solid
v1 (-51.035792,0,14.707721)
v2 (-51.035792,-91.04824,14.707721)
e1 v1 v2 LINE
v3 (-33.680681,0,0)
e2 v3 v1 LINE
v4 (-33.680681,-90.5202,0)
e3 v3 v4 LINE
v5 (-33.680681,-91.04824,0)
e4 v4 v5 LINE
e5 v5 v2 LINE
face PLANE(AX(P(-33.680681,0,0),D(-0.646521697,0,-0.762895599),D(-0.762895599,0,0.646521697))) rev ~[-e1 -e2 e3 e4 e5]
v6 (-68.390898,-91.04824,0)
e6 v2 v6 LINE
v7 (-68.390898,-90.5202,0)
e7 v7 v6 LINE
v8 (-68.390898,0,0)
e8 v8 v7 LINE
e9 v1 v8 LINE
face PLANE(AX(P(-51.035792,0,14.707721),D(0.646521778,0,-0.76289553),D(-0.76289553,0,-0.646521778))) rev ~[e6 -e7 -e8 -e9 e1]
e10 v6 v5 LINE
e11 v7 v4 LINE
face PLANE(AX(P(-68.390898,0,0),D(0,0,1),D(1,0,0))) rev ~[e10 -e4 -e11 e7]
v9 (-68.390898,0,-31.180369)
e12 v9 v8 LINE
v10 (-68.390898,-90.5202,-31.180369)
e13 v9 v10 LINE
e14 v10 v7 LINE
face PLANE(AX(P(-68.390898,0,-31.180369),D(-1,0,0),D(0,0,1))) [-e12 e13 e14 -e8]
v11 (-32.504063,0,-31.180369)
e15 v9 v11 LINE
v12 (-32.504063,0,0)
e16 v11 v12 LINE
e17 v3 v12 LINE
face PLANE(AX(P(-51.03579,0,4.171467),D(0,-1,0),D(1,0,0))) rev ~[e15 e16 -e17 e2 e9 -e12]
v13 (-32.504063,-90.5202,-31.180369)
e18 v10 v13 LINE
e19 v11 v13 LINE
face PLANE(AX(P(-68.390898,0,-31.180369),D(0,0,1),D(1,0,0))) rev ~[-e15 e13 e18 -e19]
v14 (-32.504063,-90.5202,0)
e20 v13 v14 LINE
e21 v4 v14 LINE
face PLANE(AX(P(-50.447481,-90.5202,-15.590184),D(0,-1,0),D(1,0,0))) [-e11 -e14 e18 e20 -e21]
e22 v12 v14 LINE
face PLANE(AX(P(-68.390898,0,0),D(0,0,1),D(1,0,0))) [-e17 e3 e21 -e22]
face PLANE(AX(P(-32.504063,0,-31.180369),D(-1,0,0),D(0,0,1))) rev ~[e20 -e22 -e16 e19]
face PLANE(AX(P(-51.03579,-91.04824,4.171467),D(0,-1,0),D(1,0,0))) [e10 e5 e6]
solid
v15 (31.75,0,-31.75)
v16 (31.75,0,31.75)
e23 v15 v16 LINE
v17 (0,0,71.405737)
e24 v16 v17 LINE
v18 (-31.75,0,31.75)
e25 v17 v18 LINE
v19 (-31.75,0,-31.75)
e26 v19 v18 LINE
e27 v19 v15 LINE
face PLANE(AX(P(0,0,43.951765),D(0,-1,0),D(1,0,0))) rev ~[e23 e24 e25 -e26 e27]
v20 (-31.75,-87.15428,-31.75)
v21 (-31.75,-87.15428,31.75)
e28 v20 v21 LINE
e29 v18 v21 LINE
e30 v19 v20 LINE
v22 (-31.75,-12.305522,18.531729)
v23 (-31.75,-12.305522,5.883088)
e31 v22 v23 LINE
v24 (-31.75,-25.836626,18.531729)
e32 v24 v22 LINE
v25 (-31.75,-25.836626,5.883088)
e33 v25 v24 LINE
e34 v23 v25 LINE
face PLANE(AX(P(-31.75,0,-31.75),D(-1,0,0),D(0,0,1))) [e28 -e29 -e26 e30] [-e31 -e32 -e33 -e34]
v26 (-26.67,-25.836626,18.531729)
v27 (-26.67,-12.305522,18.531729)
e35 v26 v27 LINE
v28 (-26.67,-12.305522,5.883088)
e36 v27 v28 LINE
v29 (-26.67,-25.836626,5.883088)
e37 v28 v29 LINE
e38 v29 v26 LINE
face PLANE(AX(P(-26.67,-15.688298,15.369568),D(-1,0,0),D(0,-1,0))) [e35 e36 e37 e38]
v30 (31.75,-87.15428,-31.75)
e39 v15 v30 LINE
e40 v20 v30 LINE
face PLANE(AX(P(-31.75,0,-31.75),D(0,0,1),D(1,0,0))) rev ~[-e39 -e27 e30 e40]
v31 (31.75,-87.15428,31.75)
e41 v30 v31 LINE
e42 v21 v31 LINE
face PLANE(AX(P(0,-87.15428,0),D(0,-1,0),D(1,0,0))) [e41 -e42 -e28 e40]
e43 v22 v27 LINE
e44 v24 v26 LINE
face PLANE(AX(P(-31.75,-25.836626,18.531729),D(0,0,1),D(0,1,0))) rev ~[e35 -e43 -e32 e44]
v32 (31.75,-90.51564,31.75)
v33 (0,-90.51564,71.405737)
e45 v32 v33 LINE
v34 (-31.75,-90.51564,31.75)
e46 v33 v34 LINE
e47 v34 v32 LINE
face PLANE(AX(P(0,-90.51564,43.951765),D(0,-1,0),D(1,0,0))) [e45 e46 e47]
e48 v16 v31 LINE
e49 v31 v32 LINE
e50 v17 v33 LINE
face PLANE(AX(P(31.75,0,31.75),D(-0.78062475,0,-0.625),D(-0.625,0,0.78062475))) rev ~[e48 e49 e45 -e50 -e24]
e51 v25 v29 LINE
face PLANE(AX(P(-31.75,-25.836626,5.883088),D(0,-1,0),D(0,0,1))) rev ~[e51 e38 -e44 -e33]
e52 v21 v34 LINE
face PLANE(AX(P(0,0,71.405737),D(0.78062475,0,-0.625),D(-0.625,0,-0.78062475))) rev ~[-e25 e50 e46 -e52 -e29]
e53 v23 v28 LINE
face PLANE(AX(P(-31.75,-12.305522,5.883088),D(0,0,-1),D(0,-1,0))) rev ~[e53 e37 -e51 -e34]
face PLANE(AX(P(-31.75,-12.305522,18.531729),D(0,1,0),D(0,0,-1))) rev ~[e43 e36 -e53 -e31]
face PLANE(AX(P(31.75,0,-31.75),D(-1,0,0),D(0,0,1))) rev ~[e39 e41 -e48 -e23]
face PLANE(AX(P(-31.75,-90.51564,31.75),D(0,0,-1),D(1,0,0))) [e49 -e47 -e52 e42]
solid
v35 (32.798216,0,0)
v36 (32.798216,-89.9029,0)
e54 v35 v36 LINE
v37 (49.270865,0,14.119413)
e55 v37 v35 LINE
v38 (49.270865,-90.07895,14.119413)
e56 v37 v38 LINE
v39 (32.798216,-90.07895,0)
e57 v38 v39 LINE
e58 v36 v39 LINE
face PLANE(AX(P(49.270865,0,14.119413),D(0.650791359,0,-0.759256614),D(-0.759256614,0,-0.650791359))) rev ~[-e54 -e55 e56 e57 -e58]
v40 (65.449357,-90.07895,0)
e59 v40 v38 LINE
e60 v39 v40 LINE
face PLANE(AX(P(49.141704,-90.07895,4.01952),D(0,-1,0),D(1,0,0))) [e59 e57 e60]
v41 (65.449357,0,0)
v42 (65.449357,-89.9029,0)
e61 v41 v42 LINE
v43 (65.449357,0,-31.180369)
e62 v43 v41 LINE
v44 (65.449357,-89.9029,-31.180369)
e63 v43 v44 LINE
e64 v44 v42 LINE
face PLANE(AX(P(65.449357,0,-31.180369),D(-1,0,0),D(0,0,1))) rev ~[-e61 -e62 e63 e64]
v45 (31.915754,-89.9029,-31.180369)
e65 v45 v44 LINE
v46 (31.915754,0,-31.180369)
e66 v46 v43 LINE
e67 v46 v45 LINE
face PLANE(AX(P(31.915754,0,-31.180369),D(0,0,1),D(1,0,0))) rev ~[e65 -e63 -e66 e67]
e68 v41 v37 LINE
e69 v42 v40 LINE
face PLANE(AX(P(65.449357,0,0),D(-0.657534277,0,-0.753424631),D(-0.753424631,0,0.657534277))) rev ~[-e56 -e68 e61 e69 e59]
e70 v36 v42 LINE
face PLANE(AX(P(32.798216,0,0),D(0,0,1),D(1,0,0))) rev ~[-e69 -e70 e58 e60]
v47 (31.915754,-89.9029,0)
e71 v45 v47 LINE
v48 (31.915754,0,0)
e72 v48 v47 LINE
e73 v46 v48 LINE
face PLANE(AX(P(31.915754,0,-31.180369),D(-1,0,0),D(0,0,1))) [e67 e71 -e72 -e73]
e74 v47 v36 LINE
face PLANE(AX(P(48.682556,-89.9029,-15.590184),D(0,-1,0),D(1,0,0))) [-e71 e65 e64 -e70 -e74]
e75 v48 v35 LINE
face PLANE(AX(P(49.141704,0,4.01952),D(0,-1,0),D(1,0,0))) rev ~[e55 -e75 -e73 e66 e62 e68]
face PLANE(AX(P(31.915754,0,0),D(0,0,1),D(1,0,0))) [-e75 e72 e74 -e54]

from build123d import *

# Parameters (mm, degrees)
F0_W      = 63.5
F0_H      = 63.5
F1_DEPTH  = 90.51564
F3_W      = 10.2954022586
F3_H      = 21.1791172624
F4_DEPTH  = 1.27
F6_W      = 6.7655518651
F6_H      = 6.3243201002
F7_DEPTH  = 5.08
F8_W      = 35.8868353069
F8_H      = 31.1803687364
F9_DEPTH  = 90.5202
F12_W     = 33.533602953
F12_H     = 31.1803687364
F13_DEPTH = 89.9029
F17_DEPTH = 90.07895
F19_DEPTH = 91.04824
F2_W      = 63.5
F2_H      = 63.5
F22_DEPTH = 3.36136


# Not quite as in the source:
# - the program builds the solid bodies; features that only make, move or delete a surface that nothing else refers to are left out


with BuildPart() as f1:
    # F0 (on Front) → F1 (new body)
    with BuildSketch(Plane.XZ):
        Polygon((-31.75, 31.75), (31.75, 31.75), (0, 71.4057372898), align=None)
        Rectangle(F0_W, F0_H)
    extrude(amount=F1_DEPTH)

    # F3 (on face) → F4 (cut)
    with BuildSketch(Plane.XZ.offset(90.51564)):
        with Locations((0, -20.0025010854)):
            Rectangle(F3_W, F3_H)
    extrude(amount=-F4_DEPTH, mode=Mode.SUBTRACT)

    # F6 (on face) → F7 (cut)
    with BuildSketch(Plane(origin=(-31.75, 0, 0), x_dir=(0, -1, 0), z_dir=(-1, 0, 0))):
        with Locations((15.6882982701, 15.3695684858)):
            Rectangle(F6_W, F6_H)
        with Locations((22.4538501352, 15.3695684858)):
            Rectangle(F6_W, F6_H)
        with Locations((22.4538501352, 9.0452483855)):
            Rectangle(F6_W, F6_H)
        with Locations((15.6882982701, 9.0452483855)):
            Rectangle(F6_W, F6_H)
    extrude(amount=-F7_DEPTH, mode=Mode.SUBTRACT)

    # F2 (on face) → F22 (cut)
    with BuildSketch(Plane.XZ.offset(90.51564)):
        Rectangle(F2_W, F2_H)
    extrude(amount=-F22_DEPTH, mode=Mode.SUBTRACT)


with BuildPart() as f9:
    # F8 (on Front) → F9 (new body)
    with BuildSketch(Plane.XZ):
        with Locations((-50.4474807531, -15.5901843682)):
            Rectangle(F8_W, F8_H)
    extrude(amount=F9_DEPTH)

    # F18 (on Front) → F19 (join)
    with BuildSketch(Plane.XZ):
        Polygon((-51.0357916355, 14.7077208385), (-68.3908984065, 0), (-33.6806811392, 0), align=None)
    extrude(amount=F19_DEPTH)


with BuildPart() as f13:
    # F12 (on Front) → F13 (new body)
    with BuildSketch(Plane.XZ):
        with Locations((48.6825555563, -15.5901843682)):
            Rectangle(F12_W, F12_H)
    extrude(amount=F13_DEPTH)

    # F16 (on Front) → F17 (join)
    with BuildSketch(Plane.XZ):
        Polygon((32.7982157469, 0), (65.4493570328, 0), (49.2708645761, 14.11941275), align=None)
    extrude(amount=F17_DEPTH)


solid = Compound([f1.part, f9.part, f13.part])
